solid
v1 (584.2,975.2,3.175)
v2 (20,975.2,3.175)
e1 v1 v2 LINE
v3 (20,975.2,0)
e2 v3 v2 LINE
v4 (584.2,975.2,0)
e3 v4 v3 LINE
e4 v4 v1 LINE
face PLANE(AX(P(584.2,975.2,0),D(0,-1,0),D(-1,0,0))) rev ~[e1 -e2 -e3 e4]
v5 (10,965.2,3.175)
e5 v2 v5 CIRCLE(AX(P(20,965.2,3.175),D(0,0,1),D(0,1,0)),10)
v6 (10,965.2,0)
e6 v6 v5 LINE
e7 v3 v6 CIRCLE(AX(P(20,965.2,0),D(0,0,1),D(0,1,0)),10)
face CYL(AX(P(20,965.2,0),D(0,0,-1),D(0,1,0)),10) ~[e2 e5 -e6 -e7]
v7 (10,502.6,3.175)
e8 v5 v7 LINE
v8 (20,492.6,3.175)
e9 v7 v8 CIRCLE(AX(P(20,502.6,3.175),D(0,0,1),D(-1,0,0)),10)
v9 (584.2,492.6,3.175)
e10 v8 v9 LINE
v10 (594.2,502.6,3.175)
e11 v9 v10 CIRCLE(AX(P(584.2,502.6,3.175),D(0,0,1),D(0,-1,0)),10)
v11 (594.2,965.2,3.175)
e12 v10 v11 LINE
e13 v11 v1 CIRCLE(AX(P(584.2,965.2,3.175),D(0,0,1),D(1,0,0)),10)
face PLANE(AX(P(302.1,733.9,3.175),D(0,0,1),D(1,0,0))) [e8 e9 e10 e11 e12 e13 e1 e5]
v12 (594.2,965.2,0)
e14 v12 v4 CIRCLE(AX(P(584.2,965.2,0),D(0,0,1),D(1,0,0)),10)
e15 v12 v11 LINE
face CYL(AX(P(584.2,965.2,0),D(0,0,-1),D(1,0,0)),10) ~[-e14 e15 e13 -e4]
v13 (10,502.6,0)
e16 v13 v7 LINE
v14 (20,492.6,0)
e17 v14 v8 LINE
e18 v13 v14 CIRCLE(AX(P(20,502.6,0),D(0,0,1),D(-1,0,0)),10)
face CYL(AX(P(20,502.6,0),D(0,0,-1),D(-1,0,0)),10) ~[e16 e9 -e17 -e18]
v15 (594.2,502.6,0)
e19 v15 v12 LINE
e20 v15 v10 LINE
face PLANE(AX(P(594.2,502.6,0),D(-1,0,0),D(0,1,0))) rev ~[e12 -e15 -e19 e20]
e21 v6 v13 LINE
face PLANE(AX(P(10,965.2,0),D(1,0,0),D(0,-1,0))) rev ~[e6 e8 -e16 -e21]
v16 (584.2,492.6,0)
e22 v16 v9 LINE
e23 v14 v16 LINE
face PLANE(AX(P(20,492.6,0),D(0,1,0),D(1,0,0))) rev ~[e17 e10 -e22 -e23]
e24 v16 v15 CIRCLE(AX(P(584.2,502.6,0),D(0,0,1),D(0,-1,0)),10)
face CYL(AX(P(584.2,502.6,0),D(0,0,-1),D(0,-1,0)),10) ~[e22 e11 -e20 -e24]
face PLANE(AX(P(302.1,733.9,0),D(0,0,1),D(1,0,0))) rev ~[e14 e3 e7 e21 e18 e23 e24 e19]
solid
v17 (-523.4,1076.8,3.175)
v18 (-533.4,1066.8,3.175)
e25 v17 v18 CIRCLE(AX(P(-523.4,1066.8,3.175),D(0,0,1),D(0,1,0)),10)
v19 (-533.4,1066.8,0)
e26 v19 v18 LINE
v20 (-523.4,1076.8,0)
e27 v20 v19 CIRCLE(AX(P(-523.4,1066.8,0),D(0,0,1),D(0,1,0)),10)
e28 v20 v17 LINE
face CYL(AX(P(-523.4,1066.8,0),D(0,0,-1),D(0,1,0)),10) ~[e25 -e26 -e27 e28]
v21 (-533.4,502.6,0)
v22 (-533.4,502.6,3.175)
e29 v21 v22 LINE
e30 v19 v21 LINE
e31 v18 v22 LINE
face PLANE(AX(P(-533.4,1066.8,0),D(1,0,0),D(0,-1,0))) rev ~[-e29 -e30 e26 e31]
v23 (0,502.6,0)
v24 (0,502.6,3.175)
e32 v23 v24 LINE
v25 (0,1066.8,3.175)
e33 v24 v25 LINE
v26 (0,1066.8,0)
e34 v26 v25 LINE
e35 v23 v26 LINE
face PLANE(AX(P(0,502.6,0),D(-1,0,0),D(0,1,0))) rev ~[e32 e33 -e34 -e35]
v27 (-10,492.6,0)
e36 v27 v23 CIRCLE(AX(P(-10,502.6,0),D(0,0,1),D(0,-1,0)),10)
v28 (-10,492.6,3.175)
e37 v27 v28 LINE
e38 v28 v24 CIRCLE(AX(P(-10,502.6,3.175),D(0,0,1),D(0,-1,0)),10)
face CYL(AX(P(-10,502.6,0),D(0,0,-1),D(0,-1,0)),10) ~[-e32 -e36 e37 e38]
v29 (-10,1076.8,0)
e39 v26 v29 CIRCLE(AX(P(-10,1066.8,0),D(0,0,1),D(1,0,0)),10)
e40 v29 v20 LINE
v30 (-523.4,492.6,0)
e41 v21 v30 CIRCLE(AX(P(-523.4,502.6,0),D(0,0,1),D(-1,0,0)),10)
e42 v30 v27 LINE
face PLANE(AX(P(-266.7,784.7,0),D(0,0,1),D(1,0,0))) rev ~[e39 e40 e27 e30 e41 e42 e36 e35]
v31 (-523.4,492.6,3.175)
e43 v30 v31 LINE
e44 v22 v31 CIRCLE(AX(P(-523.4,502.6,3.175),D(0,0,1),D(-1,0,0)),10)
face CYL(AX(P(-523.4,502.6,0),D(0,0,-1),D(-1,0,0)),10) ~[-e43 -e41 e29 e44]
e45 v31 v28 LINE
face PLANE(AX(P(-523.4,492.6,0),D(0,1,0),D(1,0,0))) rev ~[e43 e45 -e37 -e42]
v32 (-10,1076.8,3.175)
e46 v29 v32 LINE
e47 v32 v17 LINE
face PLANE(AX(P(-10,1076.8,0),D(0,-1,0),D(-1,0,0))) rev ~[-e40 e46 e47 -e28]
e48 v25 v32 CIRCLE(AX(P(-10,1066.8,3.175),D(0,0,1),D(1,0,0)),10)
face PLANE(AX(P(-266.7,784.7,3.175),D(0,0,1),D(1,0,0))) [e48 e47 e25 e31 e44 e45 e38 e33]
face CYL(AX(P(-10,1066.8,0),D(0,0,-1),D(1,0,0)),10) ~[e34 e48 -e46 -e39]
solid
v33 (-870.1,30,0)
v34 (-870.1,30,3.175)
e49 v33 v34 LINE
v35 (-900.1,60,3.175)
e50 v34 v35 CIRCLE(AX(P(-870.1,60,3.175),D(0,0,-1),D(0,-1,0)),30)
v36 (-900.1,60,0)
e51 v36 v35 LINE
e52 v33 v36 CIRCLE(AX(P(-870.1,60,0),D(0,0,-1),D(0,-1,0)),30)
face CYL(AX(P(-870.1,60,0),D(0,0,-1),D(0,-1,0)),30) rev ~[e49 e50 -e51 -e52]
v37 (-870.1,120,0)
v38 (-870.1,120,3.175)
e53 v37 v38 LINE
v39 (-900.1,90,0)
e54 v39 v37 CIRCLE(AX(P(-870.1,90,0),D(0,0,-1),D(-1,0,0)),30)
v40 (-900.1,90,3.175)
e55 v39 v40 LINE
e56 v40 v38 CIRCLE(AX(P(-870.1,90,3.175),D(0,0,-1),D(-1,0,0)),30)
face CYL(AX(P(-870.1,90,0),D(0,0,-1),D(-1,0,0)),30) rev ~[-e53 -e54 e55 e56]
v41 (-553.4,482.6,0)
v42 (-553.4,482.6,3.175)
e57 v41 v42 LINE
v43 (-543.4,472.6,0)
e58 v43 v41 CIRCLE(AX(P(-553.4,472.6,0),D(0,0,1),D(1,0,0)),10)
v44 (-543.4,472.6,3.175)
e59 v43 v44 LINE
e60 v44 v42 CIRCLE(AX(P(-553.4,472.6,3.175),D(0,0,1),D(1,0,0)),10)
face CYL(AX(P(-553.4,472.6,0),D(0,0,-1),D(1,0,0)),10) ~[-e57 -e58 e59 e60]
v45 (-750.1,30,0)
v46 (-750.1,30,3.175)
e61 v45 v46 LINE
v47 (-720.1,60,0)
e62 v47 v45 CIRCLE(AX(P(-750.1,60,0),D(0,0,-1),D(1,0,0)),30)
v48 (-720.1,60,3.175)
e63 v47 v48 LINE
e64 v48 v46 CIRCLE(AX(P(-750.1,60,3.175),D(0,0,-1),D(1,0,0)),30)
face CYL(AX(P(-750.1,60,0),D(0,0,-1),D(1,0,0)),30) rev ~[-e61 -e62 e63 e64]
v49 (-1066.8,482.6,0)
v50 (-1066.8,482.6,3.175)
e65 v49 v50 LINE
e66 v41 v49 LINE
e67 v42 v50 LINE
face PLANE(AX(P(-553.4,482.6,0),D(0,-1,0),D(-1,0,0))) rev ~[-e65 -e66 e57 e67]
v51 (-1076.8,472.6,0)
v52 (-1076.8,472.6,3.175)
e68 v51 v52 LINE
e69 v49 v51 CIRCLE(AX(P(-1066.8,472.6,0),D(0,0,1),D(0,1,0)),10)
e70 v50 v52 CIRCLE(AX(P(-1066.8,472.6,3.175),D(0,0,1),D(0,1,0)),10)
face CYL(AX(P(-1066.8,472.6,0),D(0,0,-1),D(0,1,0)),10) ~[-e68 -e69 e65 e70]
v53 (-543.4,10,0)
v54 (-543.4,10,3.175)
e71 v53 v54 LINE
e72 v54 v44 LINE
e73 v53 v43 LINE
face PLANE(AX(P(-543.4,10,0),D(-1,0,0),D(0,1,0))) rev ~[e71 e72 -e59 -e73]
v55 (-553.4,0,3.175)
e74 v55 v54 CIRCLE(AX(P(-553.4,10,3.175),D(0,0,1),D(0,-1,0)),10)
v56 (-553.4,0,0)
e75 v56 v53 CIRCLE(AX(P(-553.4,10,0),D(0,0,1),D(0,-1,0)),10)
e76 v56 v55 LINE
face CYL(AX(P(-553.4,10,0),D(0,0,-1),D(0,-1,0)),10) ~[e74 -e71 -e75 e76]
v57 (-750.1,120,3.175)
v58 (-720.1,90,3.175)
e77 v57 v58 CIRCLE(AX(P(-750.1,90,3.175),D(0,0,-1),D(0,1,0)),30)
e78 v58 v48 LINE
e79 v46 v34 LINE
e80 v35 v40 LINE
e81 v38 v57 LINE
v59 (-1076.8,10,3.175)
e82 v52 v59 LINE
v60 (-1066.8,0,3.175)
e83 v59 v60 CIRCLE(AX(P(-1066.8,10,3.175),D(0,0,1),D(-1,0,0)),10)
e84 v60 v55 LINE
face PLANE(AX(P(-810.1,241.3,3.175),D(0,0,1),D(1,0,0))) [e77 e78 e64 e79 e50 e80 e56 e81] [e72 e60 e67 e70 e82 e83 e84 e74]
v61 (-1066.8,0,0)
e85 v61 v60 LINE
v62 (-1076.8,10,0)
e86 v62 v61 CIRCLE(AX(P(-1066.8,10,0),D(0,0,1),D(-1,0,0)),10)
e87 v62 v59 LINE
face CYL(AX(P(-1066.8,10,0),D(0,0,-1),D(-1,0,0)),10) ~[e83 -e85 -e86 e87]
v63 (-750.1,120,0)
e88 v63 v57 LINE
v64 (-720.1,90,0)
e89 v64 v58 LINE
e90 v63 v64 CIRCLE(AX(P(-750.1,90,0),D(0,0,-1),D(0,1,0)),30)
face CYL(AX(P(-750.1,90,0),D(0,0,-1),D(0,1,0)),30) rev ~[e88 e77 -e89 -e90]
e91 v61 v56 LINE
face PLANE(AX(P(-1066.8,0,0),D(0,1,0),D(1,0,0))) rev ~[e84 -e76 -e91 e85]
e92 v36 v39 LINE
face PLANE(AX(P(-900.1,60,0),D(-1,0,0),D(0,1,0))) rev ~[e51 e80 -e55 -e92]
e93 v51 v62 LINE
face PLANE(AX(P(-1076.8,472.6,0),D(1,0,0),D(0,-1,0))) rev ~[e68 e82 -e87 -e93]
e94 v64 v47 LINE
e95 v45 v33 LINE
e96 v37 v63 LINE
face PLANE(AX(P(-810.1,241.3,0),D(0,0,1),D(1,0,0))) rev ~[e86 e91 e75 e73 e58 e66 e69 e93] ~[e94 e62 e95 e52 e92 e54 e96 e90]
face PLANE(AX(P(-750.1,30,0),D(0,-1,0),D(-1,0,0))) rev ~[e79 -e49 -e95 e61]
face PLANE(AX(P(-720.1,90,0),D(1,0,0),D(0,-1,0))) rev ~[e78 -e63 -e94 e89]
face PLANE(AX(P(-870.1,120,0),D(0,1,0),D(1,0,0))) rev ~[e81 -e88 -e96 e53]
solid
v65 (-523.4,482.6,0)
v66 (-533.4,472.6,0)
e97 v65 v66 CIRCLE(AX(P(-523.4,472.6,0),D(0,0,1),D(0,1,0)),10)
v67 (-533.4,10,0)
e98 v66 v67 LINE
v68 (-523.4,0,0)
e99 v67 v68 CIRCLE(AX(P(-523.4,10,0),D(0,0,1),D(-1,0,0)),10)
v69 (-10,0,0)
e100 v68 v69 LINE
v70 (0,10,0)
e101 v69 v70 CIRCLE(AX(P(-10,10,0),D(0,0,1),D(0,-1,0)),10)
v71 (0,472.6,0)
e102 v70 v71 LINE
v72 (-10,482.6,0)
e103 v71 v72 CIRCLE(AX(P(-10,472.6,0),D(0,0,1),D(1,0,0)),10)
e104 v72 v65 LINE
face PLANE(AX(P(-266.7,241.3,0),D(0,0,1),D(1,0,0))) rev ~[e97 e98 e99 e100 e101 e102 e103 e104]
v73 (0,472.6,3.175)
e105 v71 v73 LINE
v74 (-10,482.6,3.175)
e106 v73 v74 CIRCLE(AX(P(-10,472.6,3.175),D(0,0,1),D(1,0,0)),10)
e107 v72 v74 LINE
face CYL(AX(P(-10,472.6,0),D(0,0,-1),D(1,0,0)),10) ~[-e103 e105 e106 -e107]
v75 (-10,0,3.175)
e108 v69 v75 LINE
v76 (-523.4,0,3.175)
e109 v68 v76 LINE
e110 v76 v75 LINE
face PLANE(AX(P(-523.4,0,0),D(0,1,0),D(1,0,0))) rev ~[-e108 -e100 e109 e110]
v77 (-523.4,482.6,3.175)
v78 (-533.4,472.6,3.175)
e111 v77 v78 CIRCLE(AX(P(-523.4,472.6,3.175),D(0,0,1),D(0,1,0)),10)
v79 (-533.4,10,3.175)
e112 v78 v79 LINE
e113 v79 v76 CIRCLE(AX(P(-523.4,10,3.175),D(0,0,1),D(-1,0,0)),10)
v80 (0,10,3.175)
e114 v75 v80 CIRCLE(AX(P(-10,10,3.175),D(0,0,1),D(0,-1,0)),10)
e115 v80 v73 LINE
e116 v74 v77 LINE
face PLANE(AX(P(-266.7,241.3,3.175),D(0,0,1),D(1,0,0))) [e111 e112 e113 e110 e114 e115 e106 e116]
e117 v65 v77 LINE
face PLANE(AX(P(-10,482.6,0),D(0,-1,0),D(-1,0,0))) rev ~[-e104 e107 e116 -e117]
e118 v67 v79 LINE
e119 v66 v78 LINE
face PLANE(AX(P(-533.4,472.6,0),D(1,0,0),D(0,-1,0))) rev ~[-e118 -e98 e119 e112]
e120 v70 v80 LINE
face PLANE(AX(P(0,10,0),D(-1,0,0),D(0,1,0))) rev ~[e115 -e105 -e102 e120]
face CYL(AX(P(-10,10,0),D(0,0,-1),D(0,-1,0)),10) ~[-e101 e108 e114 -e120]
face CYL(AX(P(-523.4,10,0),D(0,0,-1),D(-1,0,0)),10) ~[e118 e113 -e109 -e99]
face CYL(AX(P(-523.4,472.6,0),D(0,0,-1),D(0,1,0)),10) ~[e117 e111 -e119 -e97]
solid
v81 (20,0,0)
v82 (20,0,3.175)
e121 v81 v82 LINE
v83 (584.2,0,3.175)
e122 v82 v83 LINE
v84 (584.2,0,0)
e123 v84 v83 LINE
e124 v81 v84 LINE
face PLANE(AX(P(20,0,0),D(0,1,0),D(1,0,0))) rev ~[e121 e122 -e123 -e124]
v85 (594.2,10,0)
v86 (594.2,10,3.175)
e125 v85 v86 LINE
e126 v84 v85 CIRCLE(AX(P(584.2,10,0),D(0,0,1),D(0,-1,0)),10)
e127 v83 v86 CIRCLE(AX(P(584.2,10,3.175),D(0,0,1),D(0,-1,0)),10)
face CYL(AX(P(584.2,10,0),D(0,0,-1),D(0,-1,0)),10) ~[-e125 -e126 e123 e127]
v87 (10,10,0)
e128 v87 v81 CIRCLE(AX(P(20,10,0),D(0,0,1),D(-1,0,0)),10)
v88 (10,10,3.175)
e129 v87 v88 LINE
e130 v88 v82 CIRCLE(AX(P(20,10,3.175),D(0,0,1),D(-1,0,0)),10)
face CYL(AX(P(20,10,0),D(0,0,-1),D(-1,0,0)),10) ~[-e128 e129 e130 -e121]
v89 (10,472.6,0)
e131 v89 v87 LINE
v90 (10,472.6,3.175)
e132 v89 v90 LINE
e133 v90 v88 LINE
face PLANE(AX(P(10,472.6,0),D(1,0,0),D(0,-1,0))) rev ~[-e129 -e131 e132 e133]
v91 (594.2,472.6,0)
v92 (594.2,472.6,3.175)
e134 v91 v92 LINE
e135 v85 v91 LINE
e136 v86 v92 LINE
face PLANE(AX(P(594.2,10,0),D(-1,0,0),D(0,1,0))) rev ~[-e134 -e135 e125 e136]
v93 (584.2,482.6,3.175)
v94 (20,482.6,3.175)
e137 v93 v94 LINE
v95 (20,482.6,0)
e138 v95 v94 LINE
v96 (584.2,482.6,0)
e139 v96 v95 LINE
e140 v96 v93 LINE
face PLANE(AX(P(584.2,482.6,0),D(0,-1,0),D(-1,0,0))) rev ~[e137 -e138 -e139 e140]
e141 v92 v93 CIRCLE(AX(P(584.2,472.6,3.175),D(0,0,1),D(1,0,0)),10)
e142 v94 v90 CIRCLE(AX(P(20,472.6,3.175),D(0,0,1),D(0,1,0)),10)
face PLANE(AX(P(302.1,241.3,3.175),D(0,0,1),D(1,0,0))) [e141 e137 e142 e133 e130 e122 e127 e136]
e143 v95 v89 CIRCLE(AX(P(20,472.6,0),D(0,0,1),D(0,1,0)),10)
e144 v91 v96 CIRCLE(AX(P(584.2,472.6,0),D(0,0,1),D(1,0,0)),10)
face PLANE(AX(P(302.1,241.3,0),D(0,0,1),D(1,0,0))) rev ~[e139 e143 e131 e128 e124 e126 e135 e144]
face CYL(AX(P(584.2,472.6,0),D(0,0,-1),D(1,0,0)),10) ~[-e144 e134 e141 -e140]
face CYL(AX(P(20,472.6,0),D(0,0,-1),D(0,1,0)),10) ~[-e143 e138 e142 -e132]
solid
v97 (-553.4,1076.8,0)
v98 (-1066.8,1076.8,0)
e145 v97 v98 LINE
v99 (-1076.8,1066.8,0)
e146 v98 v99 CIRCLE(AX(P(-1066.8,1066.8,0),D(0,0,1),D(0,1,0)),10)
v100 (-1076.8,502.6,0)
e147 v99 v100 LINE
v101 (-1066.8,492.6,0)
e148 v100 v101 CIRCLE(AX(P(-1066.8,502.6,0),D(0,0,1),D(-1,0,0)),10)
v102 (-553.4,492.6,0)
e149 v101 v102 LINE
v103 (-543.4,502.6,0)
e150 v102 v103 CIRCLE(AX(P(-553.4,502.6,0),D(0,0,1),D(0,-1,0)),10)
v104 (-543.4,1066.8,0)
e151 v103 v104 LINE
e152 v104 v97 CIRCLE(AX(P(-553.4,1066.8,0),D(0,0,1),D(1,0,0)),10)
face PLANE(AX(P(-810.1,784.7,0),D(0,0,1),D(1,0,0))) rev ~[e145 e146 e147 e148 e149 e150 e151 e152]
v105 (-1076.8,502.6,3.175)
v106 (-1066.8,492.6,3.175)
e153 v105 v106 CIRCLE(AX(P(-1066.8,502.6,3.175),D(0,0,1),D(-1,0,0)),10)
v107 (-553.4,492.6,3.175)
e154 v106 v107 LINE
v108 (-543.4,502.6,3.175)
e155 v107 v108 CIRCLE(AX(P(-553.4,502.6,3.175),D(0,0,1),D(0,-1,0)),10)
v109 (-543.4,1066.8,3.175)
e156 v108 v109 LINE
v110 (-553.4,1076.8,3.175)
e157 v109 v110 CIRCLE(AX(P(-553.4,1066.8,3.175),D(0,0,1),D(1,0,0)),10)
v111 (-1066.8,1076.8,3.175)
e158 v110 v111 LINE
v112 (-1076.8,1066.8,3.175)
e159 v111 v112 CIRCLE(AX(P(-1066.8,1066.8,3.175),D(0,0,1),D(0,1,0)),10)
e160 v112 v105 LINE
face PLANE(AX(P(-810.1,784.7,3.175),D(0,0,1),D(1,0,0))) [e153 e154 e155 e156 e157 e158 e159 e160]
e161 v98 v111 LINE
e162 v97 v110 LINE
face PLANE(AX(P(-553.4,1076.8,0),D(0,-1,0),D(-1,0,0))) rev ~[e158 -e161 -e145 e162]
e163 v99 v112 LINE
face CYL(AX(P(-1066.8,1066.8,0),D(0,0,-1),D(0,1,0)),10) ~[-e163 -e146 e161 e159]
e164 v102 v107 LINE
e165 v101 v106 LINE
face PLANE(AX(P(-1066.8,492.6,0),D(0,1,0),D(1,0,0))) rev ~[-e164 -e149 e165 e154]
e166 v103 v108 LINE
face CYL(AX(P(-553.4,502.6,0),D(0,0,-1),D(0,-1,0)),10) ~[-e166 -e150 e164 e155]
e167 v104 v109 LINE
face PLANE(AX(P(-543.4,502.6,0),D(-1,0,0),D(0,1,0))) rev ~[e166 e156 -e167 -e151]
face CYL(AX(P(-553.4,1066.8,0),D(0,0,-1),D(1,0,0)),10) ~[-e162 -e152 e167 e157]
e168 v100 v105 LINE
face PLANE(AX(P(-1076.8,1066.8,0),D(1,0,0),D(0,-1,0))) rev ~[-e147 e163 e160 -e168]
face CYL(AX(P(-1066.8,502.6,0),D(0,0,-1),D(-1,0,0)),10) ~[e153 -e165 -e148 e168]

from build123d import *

# Parameters (mm, degrees)
F1_DEPTH = 3.175


# Not quite as in the source:
# - a length typed as a fraction of an inch, garbled in the dataset ("3 / 203.2 mm" for 3/8 in), is restored
# - a feature names something its author has since deleted; it is built from what else it names


with BuildPart() as f1:
    # F0 (on Top) → F1 (new body)
    with BuildSketch(Plane.XY):
        with BuildLine():
            Line((-10, 1076.8), (-523.4, 1076.8))
            ThreePointArc((-523.4, 1076.8), (-530.4710678119, 1073.8710678119), (-533.4, 1066.8))
            Line((-533.4, 1066.8), (-533.4, 502.6))
            ThreePointArc((-533.4, 502.6), (-530.4710678119, 495.5289321881), (-523.4, 492.6))
            Line((-523.4, 492.6), (-10, 492.6))
            ThreePointArc((-10, 492.6), (-2.9289321881, 495.5289321881), (0, 502.6))
            Line((0, 502.6), (0, 1066.8))
            ThreePointArc((0, 1066.8), (-2.9289321881, 1073.8710678119), (-10, 1076.8))
        make_face()
    extrude(amount=F1_DEPTH)


with BuildPart() as f1b:
    # F0 (on Top) → F1, piece 2 (new body)
    with BuildSketch(Plane.XY):
        with BuildLine():
            Line((-10, 482.6), (-523.4, 482.6))
            ThreePointArc((-523.4, 482.6), (-530.4710678119, 479.6710678119), (-533.4, 472.6))
            Line((-533.4, 472.6), (-533.4, 10))
            ThreePointArc((-533.4, 10), (-530.4710678119, 2.9289321881), (-523.4, 0))
            Line((-523.4, 0), (-10, 0))
            ThreePointArc((-10, 0), (-2.9289321881, 2.9289321881), (0, 10))
            Line((0, 10), (0, 472.6))
            ThreePointArc((0, 472.6), (-2.9289321881, 479.6710678119), (-10, 482.6))
        make_face()
    extrude(amount=F1_DEPTH)


with BuildPart() as f1c:
    # F0 (on Top) → F1, piece 3 (new body)
    with BuildSketch(Plane.XY):
        with BuildLine():
            Line((584.2, 482.6), (20, 482.6))
            ThreePointArc((20, 482.6), (12.9289321881, 479.6710678119), (10, 472.6))
            Line((10, 472.6), (10, 10))
            ThreePointArc((10, 10), (12.9289321881, 2.9289321881), (20, 0))
            Line((20, 0), (584.2, 0))
            ThreePointArc((584.2, 0), (591.2710678119, 2.9289321881), (594.2, 10))
            Line((594.2, 10), (594.2, 472.6))
            ThreePointArc((594.2, 472.6), (591.2710678119, 479.6710678119), (584.2, 482.6))
        make_face()
    extrude(amount=F1_DEPTH)


with BuildPart() as f1d:
    # F0 (on Top) → F1, piece 4 (new body)
    with BuildSketch(Plane.XY):
        with BuildLine():
            ThreePointArc((-543.4, 1066.8), (-546.3289321881, 1073.8710678119), (-553.4, 1076.8))
            Line((-553.4, 1076.8), (-1066.8, 1076.8))
            ThreePointArc((-1066.8, 1076.8), (-1073.8710678119, 1073.8710678119), (-1076.8, 1066.8))
            Line((-1076.8, 1066.8), (-1076.8, 502.6))
            ThreePointArc((-1076.8, 502.6), (-1073.8710678119, 495.5289321881), (-1066.8, 492.6))
            Line((-1066.8, 492.6), (-553.4, 492.6))
            ThreePointArc((-553.4, 492.6), (-546.3289321881, 495.5289321881), (-543.4, 502.6))
            Line((-543.4, 502.6), (-543.4, 1066.8))
        make_face()
    extrude(amount=F1_DEPTH)


with BuildPart() as f1e:
    # F0 (on Top) → F1, piece 5 (new body)
    with BuildSketch(Plane.XY):
        with BuildLine():
            Line((-1066.8, 0), (-553.4, 0))
            ThreePointArc((-553.4, 0), (-546.3289321881, 2.9289321881), (-543.4, 10))
            Line((-543.4, 10), (-543.4, 472.6))
            ThreePointArc((-543.4, 472.6), (-546.3289321881, 479.6710678119), (-553.4, 482.6))
            Line((-553.4, 482.6), (-1066.8, 482.6))
            ThreePointArc((-1066.8, 482.6), (-1073.8710678119, 479.6710678119), (-1076.8, 472.6))
            Line((-1076.8, 472.6), (-1076.8, 10))
            ThreePointArc((-1076.8, 10), (-1073.8710678119, 2.9289321881), (-1066.8, 0))
        make_face()
        with BuildLine():
            ThreePointArc((-900.1, 90), (-891.3132034356, 111.2132034356), (-870.1, 120))
            Line((-870.1, 120), (-750.1, 120))
            ThreePointArc((-750.1, 120), (-728.8867965644, 111.2132034356), (-720.1, 90))
            Line((-720.1, 90), (-720.1, 60))
            ThreePointArc((-720.1, 60), (-728.8867965644, 38.7867965644), (-750.1, 30))
            Line((-750.1, 30), (-870.1, 30))
            ThreePointArc((-870.1, 30), (-891.3132034356, 38.7867965644), (-900.1, 60))
            Line((-900.1, 60), (-900.1, 90))
        make_face(mode=Mode.SUBTRACT)
    extrude(amount=F1_DEPTH)


with BuildPart() as f1f:
    # F0 (on Top) → F1, piece 6 (new body)
    with BuildSketch(Plane.XY):
        with BuildLine():
            ThreePointArc((10, 502.6), (12.9289321881, 495.5289321881), (20, 492.6))
            Line((20, 492.6), (584.2, 492.6))
            ThreePointArc((584.2, 492.6), (591.2710678119, 495.5289321881), (594.2, 502.6))
            Line((594.2, 502.6), (594.2, 965.2))
            ThreePointArc((594.2, 965.2), (591.2710678119, 972.2710678119), (584.2, 975.2))
            Line((584.2, 975.2), (20, 975.2))
            ThreePointArc((20, 975.2), (12.9289321881, 972.2710678119), (10, 965.2))
            Line((10, 965.2), (10, 502.6))
        make_face()
    extrude(amount=F1_DEPTH)


solid = Compound([f1.part, f1b.part, f1c.part, f1d.part, f1e.part, f1f.part])
